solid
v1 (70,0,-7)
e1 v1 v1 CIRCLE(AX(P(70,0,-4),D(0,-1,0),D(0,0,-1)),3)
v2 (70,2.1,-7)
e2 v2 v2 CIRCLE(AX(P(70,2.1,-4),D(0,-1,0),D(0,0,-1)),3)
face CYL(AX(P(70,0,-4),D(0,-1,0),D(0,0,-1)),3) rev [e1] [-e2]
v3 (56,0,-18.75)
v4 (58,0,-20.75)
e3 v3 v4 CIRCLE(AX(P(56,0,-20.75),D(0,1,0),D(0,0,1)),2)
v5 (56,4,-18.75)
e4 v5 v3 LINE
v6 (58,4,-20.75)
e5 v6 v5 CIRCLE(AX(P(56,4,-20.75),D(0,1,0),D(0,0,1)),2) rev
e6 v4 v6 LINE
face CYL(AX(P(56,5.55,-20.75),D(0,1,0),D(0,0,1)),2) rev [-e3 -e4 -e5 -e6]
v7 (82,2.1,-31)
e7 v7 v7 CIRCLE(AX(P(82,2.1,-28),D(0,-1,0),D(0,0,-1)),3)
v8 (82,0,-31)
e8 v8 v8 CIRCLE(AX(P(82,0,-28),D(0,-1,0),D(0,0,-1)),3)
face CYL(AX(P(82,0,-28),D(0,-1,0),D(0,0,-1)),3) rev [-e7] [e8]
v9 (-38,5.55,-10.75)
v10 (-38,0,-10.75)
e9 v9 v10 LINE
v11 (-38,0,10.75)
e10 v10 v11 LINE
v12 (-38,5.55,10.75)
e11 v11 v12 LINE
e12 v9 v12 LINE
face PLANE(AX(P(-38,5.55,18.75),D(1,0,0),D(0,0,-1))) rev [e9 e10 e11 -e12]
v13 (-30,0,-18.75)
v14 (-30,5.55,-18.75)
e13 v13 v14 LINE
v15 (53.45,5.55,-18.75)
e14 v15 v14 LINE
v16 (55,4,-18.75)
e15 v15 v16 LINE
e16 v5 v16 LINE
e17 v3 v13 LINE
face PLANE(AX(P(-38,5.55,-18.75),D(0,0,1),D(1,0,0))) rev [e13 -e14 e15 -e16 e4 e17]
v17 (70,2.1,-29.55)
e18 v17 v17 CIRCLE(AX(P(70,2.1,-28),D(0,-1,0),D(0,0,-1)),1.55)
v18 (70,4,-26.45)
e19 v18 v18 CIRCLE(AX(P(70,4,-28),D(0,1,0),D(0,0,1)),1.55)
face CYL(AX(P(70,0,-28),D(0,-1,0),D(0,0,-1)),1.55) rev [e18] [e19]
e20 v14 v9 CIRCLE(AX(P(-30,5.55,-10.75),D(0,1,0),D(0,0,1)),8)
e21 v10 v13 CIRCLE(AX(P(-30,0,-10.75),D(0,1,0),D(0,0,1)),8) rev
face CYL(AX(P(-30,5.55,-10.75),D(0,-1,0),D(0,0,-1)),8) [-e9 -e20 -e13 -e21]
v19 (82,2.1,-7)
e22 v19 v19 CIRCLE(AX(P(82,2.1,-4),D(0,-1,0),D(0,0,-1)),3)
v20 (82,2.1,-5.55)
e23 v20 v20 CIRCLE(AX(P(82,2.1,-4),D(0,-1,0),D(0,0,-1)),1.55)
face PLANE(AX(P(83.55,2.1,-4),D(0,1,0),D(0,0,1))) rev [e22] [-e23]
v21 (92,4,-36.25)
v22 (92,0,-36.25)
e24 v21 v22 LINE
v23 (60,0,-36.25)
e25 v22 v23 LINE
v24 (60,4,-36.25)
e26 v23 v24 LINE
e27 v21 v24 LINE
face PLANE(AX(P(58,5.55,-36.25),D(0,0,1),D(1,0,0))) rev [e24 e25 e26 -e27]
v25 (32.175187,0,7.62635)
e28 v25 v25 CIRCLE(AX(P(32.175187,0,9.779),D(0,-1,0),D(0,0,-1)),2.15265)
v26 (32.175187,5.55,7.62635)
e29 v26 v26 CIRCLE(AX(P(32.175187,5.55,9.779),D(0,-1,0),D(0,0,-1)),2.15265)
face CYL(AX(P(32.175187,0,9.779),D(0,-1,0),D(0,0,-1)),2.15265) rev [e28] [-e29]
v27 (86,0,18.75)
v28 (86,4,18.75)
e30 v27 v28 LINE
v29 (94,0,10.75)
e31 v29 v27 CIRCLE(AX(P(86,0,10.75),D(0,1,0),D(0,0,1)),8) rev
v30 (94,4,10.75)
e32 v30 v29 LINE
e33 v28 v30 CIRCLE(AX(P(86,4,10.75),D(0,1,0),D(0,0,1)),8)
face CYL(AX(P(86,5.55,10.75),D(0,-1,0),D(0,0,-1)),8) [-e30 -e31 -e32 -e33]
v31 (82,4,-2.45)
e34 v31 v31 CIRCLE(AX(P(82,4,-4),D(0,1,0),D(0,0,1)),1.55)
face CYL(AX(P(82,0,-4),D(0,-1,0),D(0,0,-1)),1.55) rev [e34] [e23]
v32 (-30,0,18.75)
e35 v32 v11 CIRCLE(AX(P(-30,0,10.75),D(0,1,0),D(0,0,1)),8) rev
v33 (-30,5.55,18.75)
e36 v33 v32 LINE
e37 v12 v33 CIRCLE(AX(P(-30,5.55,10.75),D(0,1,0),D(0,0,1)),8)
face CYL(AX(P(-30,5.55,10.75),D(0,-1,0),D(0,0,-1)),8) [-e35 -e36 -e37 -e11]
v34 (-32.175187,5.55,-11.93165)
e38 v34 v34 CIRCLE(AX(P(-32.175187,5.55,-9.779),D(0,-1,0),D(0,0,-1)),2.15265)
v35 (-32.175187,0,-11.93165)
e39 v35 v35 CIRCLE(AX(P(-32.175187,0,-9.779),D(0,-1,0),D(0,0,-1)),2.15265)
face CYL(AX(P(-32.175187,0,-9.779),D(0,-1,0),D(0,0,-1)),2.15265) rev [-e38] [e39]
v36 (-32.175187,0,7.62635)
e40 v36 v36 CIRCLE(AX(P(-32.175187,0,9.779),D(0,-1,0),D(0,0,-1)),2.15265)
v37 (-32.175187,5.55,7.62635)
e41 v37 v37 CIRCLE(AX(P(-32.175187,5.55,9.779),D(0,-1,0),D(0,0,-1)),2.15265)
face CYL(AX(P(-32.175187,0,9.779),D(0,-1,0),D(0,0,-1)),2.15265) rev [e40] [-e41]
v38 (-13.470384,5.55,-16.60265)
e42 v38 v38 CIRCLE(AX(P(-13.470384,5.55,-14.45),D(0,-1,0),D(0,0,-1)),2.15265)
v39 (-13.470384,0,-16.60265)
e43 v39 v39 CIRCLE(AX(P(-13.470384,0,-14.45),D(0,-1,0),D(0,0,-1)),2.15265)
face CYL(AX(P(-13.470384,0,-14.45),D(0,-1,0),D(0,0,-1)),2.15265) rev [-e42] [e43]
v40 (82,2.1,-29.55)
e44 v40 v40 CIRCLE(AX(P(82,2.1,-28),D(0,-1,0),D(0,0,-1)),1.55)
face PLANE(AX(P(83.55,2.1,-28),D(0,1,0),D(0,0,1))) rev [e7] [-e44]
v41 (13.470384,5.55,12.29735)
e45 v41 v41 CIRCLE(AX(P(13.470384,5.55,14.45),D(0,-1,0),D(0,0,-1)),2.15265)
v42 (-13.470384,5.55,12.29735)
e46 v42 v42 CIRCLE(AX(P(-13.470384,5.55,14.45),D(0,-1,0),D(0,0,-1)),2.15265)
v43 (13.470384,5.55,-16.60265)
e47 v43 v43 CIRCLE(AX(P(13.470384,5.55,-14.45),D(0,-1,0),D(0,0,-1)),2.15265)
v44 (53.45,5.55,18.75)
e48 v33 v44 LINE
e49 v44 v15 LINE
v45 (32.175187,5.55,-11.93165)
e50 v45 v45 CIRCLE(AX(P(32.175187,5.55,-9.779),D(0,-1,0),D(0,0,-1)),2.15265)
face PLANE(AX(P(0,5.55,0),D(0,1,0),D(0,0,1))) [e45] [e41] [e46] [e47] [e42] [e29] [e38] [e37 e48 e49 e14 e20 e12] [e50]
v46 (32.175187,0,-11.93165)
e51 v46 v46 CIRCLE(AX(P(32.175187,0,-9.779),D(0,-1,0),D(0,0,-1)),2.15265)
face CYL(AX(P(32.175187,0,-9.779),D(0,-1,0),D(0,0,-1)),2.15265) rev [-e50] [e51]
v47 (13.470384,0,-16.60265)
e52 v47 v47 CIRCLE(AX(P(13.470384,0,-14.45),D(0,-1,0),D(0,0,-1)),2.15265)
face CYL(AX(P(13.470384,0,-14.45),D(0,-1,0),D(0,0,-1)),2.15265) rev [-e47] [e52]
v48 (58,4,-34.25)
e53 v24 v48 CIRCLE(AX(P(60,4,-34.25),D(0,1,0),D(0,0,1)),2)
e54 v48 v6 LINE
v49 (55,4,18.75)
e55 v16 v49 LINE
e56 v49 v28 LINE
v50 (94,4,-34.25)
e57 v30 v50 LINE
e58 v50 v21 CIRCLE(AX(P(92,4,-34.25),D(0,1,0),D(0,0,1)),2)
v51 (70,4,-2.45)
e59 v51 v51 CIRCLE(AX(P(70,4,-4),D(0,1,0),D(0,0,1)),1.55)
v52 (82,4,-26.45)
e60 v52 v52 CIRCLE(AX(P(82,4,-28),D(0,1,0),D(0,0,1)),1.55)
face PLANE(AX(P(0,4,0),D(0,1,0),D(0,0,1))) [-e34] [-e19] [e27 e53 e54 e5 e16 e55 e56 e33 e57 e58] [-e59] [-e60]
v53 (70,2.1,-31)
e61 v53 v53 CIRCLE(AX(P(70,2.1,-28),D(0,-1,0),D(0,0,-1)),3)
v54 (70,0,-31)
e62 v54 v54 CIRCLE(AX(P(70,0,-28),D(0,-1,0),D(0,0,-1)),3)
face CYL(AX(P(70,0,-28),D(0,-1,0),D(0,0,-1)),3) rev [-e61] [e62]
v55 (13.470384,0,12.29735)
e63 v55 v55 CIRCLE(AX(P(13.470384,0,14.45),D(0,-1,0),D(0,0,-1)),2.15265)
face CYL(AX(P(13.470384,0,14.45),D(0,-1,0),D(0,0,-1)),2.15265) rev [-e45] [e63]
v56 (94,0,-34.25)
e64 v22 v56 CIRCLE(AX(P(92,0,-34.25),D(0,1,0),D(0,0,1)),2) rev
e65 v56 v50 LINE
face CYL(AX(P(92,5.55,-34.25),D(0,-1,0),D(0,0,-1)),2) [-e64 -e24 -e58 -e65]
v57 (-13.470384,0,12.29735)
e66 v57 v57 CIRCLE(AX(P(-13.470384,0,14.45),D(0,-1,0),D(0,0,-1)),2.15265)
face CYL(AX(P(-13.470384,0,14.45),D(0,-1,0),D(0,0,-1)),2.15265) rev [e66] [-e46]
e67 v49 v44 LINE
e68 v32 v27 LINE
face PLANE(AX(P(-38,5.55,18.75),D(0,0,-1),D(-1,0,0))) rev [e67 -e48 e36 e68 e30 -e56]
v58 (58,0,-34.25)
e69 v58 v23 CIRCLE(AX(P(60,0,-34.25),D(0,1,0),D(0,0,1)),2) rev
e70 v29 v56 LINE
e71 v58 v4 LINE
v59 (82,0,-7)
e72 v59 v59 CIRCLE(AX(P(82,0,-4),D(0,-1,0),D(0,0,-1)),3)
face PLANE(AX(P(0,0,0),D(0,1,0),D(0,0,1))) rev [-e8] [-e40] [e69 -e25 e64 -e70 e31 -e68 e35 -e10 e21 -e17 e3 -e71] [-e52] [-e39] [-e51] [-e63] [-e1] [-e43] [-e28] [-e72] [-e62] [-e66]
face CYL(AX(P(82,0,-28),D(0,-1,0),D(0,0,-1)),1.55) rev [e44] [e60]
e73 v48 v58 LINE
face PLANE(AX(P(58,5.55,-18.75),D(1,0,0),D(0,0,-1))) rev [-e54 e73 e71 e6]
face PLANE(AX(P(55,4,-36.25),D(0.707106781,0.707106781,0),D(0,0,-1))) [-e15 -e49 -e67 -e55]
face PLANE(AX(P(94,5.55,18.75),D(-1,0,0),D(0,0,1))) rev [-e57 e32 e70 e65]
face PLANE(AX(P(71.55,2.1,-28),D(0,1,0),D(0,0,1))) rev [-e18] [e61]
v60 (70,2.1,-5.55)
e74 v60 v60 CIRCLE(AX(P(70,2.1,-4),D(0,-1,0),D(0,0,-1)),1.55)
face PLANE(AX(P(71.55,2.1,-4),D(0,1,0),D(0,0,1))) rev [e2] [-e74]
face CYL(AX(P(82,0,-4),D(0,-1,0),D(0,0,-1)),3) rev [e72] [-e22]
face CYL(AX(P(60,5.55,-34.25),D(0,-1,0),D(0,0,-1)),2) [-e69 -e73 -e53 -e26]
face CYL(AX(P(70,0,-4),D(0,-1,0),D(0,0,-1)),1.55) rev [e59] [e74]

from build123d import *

# Parameters (mm, degrees)
BOSS_EXTRUDE1_DEPTH                                = 5.55
SKETCH2_W                                          = 39
SKETCH2_H                                          = 55
CUT_EXTRUDE1_DEPTH                                 = 1.55
FILLET1_R                                          = 8
CBORE_FOR_M2_5_PAN_HEAD_MACHINE_SCREW1_D           = 3.1
CBORE_FOR_M2_5_PAN_HEAD_MACHINE_SCREW1_CBORE_D     = 6
CBORE_FOR_M2_5_PAN_HEAD_MACHINE_SCREW1_CBORE_DEPTH = 2.1
FILLET2_R                                          = 2
CHAMFER1_SIZE                                      = 1.55
F_6_CLEARANCE_HOLE1_D                              = 4.3053


with BuildPart() as part:
    # Sketch1 → Boss-Extrude1 (new body)
    with BuildSketch(Plane(origin=(0, 0, 0), x_dir=(1, 0, 0), z_dir=(0, 1, 0))):
        Polygon((-38, -18.75), (94, -18.75), (94, 36.25), (58, 36.25), (58, 18.75), (-38, 18.75), align=None)
    extrude(amount=BOSS_EXTRUDE1_DEPTH)

    # Sketch2 → Cut-Extrude1 (cut)
    with BuildSketch(Plane(origin=(0, 5.55, 0), x_dir=(1, 0, 0), z_dir=(0, 1, 0))):
        with Locations((74.5, 8.75)):
            Rectangle(SKETCH2_W, SKETCH2_H)
    extrude(amount=-CUT_EXTRUDE1_DEPTH, mode=Mode.SUBTRACT)

    # Fillet1
    fillet1_edges = [part.edges().sort_by_distance(p)[0] for p in [
        (-38, 2.775, 18.75),
        (-38, 2.775, -18.75),
        (94, 2, 18.75),
    ]]
    fillet(fillet1_edges, radius=FILLET1_R)

    # CBORE for M2.5 Pan Head Machine Screw1 (through all)
    with Locations(Plane(origin=(0, 0, 0), x_dir=(-1, 0, 0), z_dir=(0, -1, 0))):
        with Locations((-82, 28), (-82, 4), (-70, 4), (-70, 28)):
            CounterBoreHole(CBORE_FOR_M2_5_PAN_HEAD_MACHINE_SCREW1_D / 2, CBORE_FOR_M2_5_PAN_HEAD_MACHINE_SCREW1_CBORE_D / 2, CBORE_FOR_M2_5_PAN_HEAD_MACHINE_SCREW1_CBORE_DEPTH)

    # Fillet2
    fillet2_edges = [part.edges().sort_by_distance(p)[0] for p in [
        (94, 2, -36.25),
        (58, 2, -18.75),
        (58, 2, -36.25),
    ]]
    fillet(fillet2_edges, radius=FILLET2_R)

    # Chamfer1
    chamfer1_edges = [part.edges().sort_by_distance(p)[0] for p in [
        (55, 5.55, 0),
    ]]
    chamfer(chamfer1_edges, length=CHAMFER1_SIZE - 0.0001)  # a hair under: the kernel refuses the full size

    # #6 Clearance Hole1 (through all)
    with Locations(Plane(origin=(0, 0, 0), x_dir=(-1, 0, 0), z_dir=(0, -1, 0))):
        with Locations((-32.175187039, 9.779), (-32.175187039, -9.779), (32.175187039, 9.779), (32.175187039, -9.779), (13.470384182, -14.45), (-13.470384182, -14.45), (13.470384182, 14.45), (-13.470384182, 14.45)):
            Hole(F_6_CLEARANCE_HOLE1_D / 2)


solid = part.part
